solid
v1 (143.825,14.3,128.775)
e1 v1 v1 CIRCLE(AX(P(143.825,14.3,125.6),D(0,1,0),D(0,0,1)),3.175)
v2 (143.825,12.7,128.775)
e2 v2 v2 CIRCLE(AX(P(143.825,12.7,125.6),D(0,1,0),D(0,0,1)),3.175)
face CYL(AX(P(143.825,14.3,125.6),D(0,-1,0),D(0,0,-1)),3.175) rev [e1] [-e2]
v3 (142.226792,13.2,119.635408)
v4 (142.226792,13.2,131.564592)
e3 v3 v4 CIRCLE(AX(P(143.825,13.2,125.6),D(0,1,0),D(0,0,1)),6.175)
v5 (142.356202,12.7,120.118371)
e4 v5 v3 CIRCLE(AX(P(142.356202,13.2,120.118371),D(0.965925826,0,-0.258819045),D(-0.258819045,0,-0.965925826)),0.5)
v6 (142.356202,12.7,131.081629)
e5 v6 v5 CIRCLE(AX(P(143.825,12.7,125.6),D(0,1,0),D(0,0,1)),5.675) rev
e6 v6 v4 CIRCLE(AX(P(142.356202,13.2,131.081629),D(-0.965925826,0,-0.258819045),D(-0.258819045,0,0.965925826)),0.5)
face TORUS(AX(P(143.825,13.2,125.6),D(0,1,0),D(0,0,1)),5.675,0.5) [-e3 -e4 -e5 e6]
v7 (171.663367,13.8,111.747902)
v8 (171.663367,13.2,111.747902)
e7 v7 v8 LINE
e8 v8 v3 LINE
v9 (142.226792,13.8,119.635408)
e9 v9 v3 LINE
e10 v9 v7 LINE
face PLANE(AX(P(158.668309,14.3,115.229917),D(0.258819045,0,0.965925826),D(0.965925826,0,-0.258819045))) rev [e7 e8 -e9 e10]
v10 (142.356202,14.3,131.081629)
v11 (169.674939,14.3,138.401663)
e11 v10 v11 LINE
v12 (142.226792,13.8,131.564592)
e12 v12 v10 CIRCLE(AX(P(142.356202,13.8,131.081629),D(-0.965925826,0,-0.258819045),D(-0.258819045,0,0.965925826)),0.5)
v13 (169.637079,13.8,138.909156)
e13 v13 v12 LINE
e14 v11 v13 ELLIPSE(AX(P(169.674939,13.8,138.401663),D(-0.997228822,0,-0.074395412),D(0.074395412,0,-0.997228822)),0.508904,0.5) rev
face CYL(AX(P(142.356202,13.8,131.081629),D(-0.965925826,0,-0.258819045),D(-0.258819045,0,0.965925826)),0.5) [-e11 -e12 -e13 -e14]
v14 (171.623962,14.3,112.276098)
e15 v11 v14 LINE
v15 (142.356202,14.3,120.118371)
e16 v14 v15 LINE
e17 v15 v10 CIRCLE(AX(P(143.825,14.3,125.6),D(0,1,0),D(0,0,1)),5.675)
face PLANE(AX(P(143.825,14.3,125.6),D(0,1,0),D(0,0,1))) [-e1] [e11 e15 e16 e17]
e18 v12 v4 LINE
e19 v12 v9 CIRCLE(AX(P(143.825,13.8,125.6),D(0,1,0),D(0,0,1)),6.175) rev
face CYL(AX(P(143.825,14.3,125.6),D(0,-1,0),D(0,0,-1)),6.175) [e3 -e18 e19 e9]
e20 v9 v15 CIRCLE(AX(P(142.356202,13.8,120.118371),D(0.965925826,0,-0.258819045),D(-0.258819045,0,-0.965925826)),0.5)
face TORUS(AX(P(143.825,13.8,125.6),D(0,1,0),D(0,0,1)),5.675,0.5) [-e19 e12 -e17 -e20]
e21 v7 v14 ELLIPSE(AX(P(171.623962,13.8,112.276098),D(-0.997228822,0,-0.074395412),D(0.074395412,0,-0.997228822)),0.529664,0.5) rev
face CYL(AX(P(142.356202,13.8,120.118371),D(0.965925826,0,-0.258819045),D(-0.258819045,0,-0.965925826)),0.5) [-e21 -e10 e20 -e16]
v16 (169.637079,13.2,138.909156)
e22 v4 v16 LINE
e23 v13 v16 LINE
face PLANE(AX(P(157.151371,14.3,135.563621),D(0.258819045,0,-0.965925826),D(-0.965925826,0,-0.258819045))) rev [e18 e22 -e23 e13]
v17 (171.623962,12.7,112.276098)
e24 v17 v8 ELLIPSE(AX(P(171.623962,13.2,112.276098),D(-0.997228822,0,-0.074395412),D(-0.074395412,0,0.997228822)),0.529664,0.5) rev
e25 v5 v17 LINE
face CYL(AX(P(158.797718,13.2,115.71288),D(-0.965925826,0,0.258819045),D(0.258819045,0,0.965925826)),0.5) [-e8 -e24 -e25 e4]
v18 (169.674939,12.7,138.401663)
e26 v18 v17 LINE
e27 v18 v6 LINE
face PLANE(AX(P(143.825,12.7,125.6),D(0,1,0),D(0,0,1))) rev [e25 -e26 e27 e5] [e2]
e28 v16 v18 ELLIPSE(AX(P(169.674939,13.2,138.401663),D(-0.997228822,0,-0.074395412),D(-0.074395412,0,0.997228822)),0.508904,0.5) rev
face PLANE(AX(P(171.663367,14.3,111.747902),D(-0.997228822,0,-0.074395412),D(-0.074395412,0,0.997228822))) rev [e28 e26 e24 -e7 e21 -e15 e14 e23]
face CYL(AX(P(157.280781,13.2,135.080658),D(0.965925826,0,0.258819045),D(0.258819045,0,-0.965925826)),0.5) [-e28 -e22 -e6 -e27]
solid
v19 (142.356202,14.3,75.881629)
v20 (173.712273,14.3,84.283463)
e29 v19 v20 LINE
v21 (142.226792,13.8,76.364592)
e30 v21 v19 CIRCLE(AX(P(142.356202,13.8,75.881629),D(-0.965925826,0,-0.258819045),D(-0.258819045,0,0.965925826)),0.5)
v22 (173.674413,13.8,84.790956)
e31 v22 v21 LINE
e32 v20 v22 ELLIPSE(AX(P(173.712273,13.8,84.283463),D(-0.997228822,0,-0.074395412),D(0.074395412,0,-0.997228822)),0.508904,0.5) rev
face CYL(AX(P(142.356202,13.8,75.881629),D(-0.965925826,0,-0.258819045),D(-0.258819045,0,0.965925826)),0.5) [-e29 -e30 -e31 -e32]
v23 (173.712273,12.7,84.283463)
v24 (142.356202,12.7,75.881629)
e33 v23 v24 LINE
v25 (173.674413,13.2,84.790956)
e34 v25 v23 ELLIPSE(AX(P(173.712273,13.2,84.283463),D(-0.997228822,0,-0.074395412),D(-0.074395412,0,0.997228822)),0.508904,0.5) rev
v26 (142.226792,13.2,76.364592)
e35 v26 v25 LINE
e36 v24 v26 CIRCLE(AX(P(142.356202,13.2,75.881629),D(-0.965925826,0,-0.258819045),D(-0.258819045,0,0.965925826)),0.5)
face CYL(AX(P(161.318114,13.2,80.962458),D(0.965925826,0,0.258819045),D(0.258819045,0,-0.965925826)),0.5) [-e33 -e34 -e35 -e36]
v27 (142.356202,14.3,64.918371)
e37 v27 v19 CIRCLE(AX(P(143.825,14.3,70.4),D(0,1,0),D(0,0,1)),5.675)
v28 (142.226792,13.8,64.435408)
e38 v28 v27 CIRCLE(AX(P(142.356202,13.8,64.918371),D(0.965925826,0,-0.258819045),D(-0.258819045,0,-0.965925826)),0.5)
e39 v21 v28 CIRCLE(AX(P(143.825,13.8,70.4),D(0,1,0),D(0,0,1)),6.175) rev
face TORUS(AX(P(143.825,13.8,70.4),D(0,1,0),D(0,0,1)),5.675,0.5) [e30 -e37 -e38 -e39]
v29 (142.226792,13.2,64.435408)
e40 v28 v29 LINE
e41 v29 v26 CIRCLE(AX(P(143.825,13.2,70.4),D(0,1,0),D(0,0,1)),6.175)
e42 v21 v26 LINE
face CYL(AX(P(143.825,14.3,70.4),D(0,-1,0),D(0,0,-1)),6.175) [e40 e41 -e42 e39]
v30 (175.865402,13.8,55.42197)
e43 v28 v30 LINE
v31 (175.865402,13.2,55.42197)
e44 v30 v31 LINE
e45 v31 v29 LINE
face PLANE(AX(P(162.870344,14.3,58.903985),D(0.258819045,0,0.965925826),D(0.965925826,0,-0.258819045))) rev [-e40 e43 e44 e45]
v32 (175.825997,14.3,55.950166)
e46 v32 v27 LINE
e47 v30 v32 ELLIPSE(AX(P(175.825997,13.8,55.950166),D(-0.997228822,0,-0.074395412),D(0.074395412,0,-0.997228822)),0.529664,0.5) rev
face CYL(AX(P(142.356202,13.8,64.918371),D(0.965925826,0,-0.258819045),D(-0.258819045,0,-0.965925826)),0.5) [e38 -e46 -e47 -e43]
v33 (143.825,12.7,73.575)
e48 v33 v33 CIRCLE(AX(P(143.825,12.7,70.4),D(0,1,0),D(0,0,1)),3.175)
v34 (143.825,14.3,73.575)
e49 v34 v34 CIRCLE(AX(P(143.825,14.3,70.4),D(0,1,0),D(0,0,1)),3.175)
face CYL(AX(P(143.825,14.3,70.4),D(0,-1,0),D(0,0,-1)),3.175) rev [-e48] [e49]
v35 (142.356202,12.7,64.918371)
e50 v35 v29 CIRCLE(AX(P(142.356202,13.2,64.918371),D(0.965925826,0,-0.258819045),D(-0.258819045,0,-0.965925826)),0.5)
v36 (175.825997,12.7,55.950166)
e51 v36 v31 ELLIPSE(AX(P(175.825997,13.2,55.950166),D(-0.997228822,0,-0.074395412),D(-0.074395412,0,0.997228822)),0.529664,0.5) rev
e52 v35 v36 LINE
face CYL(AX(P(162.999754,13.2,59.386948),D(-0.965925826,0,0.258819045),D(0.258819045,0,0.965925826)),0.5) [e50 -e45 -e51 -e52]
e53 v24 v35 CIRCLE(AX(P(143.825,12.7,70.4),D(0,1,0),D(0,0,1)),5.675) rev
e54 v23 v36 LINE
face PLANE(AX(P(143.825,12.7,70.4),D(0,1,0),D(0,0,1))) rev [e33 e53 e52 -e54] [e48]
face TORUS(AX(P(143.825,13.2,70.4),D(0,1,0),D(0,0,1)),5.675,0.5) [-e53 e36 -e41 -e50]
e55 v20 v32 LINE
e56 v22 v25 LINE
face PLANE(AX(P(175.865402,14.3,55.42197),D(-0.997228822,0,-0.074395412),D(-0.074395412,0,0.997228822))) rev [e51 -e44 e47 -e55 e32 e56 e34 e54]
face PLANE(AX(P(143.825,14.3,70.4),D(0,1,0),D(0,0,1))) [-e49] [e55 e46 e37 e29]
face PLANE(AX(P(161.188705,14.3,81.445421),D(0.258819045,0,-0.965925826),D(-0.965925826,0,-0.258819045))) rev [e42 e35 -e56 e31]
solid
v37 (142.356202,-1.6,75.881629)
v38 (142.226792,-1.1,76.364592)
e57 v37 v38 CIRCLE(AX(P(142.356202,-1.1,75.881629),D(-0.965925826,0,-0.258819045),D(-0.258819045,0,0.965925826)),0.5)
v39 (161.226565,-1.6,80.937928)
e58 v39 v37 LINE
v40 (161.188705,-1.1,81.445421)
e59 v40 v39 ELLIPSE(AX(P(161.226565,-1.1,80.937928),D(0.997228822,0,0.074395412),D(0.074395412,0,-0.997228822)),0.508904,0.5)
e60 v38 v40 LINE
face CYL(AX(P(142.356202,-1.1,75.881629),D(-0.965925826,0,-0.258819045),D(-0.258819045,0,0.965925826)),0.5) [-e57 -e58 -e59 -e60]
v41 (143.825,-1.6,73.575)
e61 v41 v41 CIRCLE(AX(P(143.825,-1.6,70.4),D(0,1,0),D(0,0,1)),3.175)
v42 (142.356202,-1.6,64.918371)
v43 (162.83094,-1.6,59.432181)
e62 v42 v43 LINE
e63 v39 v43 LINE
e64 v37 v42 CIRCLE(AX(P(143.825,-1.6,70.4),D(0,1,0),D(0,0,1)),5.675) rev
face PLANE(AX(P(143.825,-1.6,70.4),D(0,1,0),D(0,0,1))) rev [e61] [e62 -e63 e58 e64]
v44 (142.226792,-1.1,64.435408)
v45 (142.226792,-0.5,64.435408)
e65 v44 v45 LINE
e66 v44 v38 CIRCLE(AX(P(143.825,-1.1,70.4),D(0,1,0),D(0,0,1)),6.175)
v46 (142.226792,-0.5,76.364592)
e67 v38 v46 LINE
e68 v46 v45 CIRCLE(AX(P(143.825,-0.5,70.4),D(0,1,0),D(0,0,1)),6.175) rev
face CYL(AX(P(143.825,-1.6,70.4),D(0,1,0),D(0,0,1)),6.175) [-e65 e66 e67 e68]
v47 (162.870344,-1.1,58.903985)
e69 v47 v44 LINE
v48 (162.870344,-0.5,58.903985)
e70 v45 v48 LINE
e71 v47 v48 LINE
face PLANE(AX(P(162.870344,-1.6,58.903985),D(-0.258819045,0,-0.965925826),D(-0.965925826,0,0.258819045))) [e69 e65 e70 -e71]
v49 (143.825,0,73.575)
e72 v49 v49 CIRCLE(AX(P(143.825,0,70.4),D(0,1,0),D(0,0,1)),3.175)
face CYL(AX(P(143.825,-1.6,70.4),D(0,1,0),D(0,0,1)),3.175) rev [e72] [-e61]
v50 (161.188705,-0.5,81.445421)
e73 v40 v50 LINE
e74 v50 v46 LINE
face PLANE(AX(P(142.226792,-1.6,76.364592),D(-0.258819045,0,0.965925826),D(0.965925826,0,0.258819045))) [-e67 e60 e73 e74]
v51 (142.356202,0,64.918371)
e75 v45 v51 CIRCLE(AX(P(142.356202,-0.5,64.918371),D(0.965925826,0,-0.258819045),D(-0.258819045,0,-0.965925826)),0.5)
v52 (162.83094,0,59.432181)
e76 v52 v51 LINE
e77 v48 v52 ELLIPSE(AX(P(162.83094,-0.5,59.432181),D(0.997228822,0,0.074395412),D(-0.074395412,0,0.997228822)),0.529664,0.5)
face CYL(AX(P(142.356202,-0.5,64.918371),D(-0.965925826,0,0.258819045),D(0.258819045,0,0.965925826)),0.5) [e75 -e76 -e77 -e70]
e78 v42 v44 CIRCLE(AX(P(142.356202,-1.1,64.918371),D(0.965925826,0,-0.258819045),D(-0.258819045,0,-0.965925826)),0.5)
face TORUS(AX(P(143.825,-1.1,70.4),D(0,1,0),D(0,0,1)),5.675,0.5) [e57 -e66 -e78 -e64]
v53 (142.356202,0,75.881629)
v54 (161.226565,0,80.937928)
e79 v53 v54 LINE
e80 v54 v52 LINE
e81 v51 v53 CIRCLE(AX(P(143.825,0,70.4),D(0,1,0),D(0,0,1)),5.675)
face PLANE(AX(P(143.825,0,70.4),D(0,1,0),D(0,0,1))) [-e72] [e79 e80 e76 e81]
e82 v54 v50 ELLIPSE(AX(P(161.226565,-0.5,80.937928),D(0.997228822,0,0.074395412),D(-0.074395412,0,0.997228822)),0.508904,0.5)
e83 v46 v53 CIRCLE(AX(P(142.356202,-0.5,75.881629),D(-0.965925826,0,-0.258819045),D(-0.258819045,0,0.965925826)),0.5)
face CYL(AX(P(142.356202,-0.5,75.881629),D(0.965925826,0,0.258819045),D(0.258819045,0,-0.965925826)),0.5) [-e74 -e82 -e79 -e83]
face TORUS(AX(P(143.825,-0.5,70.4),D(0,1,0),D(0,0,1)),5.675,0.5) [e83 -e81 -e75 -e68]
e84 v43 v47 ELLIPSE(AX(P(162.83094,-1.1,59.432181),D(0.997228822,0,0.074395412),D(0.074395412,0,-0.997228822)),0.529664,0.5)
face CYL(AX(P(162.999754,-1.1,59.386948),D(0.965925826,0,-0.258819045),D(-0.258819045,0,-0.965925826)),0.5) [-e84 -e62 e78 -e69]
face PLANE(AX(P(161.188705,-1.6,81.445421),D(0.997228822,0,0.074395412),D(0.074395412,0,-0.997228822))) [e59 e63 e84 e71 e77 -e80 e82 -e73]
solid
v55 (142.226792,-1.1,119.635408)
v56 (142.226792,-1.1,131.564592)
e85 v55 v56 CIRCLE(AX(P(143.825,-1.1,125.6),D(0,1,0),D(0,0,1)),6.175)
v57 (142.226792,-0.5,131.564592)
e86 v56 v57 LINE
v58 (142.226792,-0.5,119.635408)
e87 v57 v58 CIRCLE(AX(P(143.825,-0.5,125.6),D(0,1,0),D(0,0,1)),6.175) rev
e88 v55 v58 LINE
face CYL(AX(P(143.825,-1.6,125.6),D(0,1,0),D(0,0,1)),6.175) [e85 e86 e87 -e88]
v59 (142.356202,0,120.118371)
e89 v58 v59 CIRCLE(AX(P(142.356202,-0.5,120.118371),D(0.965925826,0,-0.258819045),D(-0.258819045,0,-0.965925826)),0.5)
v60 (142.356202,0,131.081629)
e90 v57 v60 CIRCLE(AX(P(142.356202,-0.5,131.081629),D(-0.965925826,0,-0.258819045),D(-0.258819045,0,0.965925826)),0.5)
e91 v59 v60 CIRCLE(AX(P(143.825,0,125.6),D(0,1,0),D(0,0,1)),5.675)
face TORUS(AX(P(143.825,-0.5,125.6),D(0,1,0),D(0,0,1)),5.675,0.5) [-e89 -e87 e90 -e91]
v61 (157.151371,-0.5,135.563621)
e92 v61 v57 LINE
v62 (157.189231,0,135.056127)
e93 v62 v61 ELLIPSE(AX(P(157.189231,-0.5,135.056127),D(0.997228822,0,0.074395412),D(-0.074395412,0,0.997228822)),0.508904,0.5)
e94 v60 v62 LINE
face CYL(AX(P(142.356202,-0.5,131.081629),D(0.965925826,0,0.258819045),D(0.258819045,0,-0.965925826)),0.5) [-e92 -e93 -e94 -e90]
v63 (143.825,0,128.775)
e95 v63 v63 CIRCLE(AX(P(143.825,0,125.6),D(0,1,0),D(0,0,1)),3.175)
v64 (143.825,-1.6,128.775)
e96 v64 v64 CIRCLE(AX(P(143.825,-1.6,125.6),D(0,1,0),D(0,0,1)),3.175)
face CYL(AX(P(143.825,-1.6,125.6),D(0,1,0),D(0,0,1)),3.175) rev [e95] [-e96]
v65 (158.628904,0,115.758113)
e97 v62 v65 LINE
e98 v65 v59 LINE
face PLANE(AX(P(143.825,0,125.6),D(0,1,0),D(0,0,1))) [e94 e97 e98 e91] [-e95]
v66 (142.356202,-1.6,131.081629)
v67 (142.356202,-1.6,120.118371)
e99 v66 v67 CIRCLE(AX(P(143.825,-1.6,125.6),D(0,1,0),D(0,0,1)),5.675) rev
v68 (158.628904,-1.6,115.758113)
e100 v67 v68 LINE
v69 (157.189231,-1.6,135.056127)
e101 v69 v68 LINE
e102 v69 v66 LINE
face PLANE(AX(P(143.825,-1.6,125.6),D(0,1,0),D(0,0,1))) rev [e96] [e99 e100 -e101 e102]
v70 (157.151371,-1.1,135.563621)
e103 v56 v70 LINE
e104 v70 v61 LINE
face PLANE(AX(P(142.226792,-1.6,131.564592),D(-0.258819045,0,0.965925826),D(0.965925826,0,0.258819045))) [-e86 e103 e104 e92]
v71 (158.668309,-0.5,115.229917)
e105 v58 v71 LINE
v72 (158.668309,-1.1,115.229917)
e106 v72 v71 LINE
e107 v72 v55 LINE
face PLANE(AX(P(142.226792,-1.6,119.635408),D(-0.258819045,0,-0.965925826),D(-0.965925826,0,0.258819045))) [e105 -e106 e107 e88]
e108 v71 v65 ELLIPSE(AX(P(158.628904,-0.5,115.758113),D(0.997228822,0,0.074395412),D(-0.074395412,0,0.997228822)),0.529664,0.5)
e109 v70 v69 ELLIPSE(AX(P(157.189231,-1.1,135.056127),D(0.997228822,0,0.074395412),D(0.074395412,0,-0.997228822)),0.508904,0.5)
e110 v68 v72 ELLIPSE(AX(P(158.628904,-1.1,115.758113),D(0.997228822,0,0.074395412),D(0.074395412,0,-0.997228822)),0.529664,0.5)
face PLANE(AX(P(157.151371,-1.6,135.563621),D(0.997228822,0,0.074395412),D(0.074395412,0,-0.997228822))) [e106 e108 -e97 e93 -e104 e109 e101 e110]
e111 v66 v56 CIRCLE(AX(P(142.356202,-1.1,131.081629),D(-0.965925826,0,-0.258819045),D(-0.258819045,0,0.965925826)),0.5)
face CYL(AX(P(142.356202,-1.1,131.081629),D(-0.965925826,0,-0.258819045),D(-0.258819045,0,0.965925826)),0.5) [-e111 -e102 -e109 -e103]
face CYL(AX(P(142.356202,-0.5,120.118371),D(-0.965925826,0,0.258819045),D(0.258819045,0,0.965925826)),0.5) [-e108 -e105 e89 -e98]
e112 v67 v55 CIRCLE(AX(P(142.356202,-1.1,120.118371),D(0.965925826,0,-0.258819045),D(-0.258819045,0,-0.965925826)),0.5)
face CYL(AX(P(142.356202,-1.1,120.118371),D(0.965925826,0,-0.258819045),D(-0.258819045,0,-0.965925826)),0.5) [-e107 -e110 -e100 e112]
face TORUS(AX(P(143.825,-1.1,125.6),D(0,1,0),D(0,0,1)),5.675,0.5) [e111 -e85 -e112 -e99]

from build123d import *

# Parameters (mm, degrees)
SKETCH11_R                        = 12.7
SKETCH11_R_2                      = 10.7
STRUCTURAL_MEMBER1_DEPTH          = 323.944708568
SKETCH11_ON_SEGMENT_2_R           = 12.7
SKETCH11_ON_SEGMENT_2_R_2         = 10.7
STRUCTURAL_MEMBER1_2_DEPTH        = 323.944708568
EXTRUDEBEARINGRETAINERCYL_START   = -8.5
SKETCH13_R                        = 20.1
SKETCH13_R_2                      = 18.5
EXTRUDEBEARINGRETAINERCYL_DEPTH   = 17
EXTRUDEBRACKETBOTTOM_DEPTH        = 1
EXTRUDEBRACKETTOP_DEPTH           = 1
EXTRUDEBRACKETTOP_2_DEPTH         = 1
EXTRUDEBRACKETTOP_3_DEPTH         = 1
EXTRUDEPILLOWBLOCKTOCYL_START     = -72.5
EXTRUDEPILLOWBLOCKTOCYL_DEPTH     = 1.6
EXTRUDEPILLOWBLOCKTOCYL_START_2   = -59.1
EXTRUDEPILLOWBLOCKTOCYL_2_DEPTH   = 1.6
EXTRUDEPILLOWBLOCKTOCYL_START_3   = 57.5
EXTRUDEPILLOWBLOCKTOCYL_3_DEPTH   = 1.6
EXTRUDEPILLOWBLOCKTOCYL_START_4   = 70.9
EXTRUDEPILLOWBLOCKTOCYL_4_DEPTH   = 1.6
SKETCH28_W                        = 75.967346768
SKETCH28_H                        = 30.904
EXTRUDETRIMPILLOWBLOCKS_DEPTH     = 145
SKETCH29_R                        = 6
EXTRUDEPILLOWBLOCKBOSSES_DEPTH    = 30.904
FILLET6_START                     = 1
FILLET6_DEPTH                     = 29.904
FILLET6_2_DEPTH                   = 30.904
FILLET6_3_ANGLE                   = 105.281339
FILLET6_4_ANGLE                   = 105.281339
FILLET6_5_ANGLE                   = 105.281339
EXTRUDEPILLOWBLOCKTOPS_REACH      = 277.503
EXTRUDEPILLOWBLOCKTOPS_END_RADIUS = 20.1
SKETCH30_W                        = 15
SKETCH30_H                        = 3
FILLETPILLOWBLOCKTOPS_R           = 3
SKETCH19_R                        = 3.175
EXTRUDEBEARINGRETAINERHOLES_DEPTH = 380.637720529
EXTRUDEBRACKETFRONT_DEPTH         = 1.6
EXTRUDEBRACKETREAR_START          = -70
EXTRUDEBRACKETREAR_DEPTH          = 1.6
SKETCH25_R                        = 6.175
EXTRUDEMOUNTINGBOSSES_DEPTH       = 11.7
EXTRUDE2_DEPTH                    = 380.993173687
EXTRUDE2_DEPTH_BACK               = 380.993173687
SKETCH26_R                        = 3.175
SKETCH36_R                        = 3.175
EXTRUDE7_DEPTH                    = 1.6
EXTRUDE7_2_DEPTH                  = 1.6
SKETCH38_R                        = 3.175
EXTRUDE10_DEPTH                   = 1.6
EXTRUDE10_2_DEPTH                 = 1.6
FILLET25_R                        = 0.5
FILLET26_R                        = 0.5
FILLET27_R                        = 0.5
FILLET28_R                        = 0.5


with BuildPart() as part:
    # Sketch11 → Structural Member1 (new body)
    with BuildSketch(Plane(origin=(-155.9, 0, 323.047), x_dir=(-0.9972288216354868, 0, 0.07439541181752263), z_dir=(-0.07439541181752263, 0, -0.9972288216354868))):
        Circle(SKETCH11_R)
        Circle(SKETCH11_R_2, mode=Mode.SUBTRACT)
    extrude(amount=STRUCTURAL_MEMBER1_DEPTH)


with BuildPart() as body_2:
    # Sketch11 on segment 2 (carried to segment 2) → Structural Member1 2 (new body)
    with BuildSketch(Plane(origin=(180, 0, 0), x_dir=(0.997228822, 0, 0.074395412), z_dir=(-0.074395412, 0, 0.997228822))):
        Circle(SKETCH11_ON_SEGMENT_2_R)
        Circle(SKETCH11_ON_SEGMENT_2_R_2, mode=Mode.SUBTRACT)
    extrude(amount=STRUCTURAL_MEMBER1_2_DEPTH)


with BuildPart() as body_3:
    # Sketch13 → ExtrudeBearingRetainerCyl (new body)
    with BuildSketch(Plane(origin=(65, 0, 0), x_dir=(0, 0, -1), z_dir=(1, 0, 0)).offset(EXTRUDEBEARINGRETAINERCYL_START)):
        with Locations((-98, 27.904)):
            Circle(SKETCH13_R)
        with Locations((-98, 27.904)):
            Circle(SKETCH13_R_2, mode=Mode.SUBTRACT)
    extrude(amount=EXTRUDEBEARINGRETAINERCYL_DEPTH)


with BuildPart() as body_4:
    # MirrorBearingRetainerCyl: mirrored copy
    add(body_3.part.mirror(Plane(origin=(0, 0, 0), x_dir=(0, 0, 1), z_dir=(1, 0, 0))))



with BuildPart() as body_5:
    # Sketch15 → ExtrudeBracketBottom (new body)
    with BuildSketch(Plane(origin=(0, 0, 0), x_dir=(1, 0, 0), z_dir=(0, 1, 0))):
        with BuildLine():
            Line((-150, -63), (115, -63))
            ThreePointArc((115, -63), (122.071067812, -60.071067812), (125, -53))
            Line((125, -53), (125, -48))
            ThreePointArc((125, -48), (137.5, -35.5), (150, -48))
            Line((150, -48), (150, -63))
            Line((150, -63), (150, -133))
            Line((150, -133), (-150, -133))
            Line((-150, -133), (-150, -63))
        make_face()
        with BuildLine():
            Line((-130, -75), (130, -75))
            ThreePointArc((130, -75), (137.071067812, -77.928932188), (140, -85))
            Line((140, -85), (140, -111))
            ThreePointArc((140, -111), (137.071067812, -118.071067812), (130, -121))
            Line((130, -121), (-130, -121))
            ThreePointArc((-130, -121), (-137.071067812, -118.071067812), (-140, -111))
            Line((-140, -111), (-140, -85))
            ThreePointArc((-140, -85), (-137.071067812, -77.928932188), (-130, -75))
        make_face(mode=Mode.SUBTRACT)
    extrude(amount=EXTRUDEBRACKETBOTTOM_DEPTH)


with BuildPart() as body_6:
    # Sketch17 → ExtrudeBracketTop (new body)
    with BuildSketch(Plane(origin=(0, 12.7, 0), x_dir=(-1, 0, 0), z_dir=(0, 1, 0))):
        with BuildLine():
            Line((150, 63), (72.5, 63))
            Line((72.5, 63), (72.5, 82))
            Line((72.5, 82), (77.5, 82))
            ThreePointArc((77.5, 82), (80.328427125, 83.171572875), (81.5, 86))
            Line((81.5, 86), (81.5, 110))
            ThreePointArc((81.5, 110), (80.328427125, 112.828427125), (77.5, 114))
            Line((77.5, 114), (72.5, 114))
            Line((72.5, 114), (72.5, 133))
            Line((72.5, 133), (150, 133))
            Line((150, 133), (150, 63))
        make_face()
        with BuildLine():
            Line((104.221825407, 94.464466094), (97.535533906, 87.778174593))
            ThreePointArc((97.535533906, 87.778174593), (92.086582838, 86.694310836), (89, 91.313708499))
            Line((89, 91.313708499), (89, 104.686291501))
            ThreePointArc((89, 104.686291501), (92.086582838, 109.305689164), (97.535533906, 108.221825407))
            Line((97.535533906, 108.221825407), (104.221825407, 101.535533906))
            ThreePointArc((104.221825407, 101.535533906), (105.686291501, 98), (104.221825407, 94.464466094))
        make_face(mode=Mode.SUBTRACT)
        with BuildLine():
            Line((118.686291501, 121), (105.313708499, 121))
            ThreePointArc((105.313708499, 121), (100.694310836, 117.913417162), (101.778174593, 112.464466094))
            Line((101.778174593, 112.464466094), (108.464466094, 105.778174593))
            ThreePointArc((108.464466094, 105.778174593), (112, 104.313708499), (115.535533906, 105.778174593))
            Line((115.535533906, 105.778174593), (122.221825407, 112.464466094))
            ThreePointArc((122.221825407, 112.464466094), (123.305689164, 117.913417162), (118.686291501, 121))
        make_face(mode=Mode.SUBTRACT)
        with BuildLine():
            Line((108.464466094, 90.221825407), (101.778174593, 83.535533906))
            ThreePointArc((101.778174593, 83.535533906), (100.694310836, 78.086582838), (105.313708499, 75))
            Line((105.313708499, 75), (118.686291501, 75))
            ThreePointArc((118.686291501, 75), (123.305689164, 78.086582838), (122.221825407, 83.535533906))
            Line((122.221825407, 83.535533906), (115.535533906, 90.221825407))
            ThreePointArc((115.535533906, 90.221825407), (112, 91.686291501), (108.464466094, 90.221825407))
        make_face(mode=Mode.SUBTRACT)
        with BuildLine():
            Line((126.464466094, 108.221825407), (119.778174593, 101.535533906))
            ThreePointArc((119.778174593, 101.535533906), (118.313708499, 98), (119.778174593, 94.464466094))
            Line((119.778174593, 94.464466094), (126.464466094, 87.778174593))
            ThreePointArc((126.464466094, 87.778174593), (131.913417162, 86.694310836), (135, 91.313708499))
            Line((135, 91.313708499), (135, 104.686291501))
            ThreePointArc((135, 104.686291501), (131.913417162, 109.305689164), (126.464466094, 108.221825407))
        make_face(mode=Mode.SUBTRACT)
    extrude(amount=-EXTRUDEBRACKETTOP_DEPTH)


with BuildPart() as body_7:
    # Sketch17 → ExtrudeBracketTop 2 (new body)
    with BuildSketch(Plane(origin=(0, 12.7, 0), x_dir=(-1, 0, 0), z_dir=(0, 1, 0))):
        with BuildLine():
            Line((-150, 133), (-72.5, 133))
            Line((-72.5, 133), (-72.5, 114))
            Line((-72.5, 114), (-77.5, 114))
            ThreePointArc((-77.5, 114), (-80.328427125, 112.828427125), (-81.5, 110))
            Line((-81.5, 110), (-81.5, 86))
            ThreePointArc((-81.5, 86), (-80.328427125, 83.171572875), (-77.5, 82))
            Line((-77.5, 82), (-72.5, 82))
            Line((-72.5, 82), (-72.5, 63))
            Line((-72.5, 63), (-115, 63))
            ThreePointArc((-115, 63), (-122.071067812, 60.071067812), (-125, 53))
            Line((-125, 53), (-125, 48))
            ThreePointArc((-125, 48), (-137.5, 35.5), (-150, 48))
            Line((-150, 48), (-150, 51.104))
            Line((-150, 51.104), (-150, 133))
        make_face()
        with BuildLine():
            Line((-119.778174593, 94.464466094), (-126.464466094, 87.778174593))
            ThreePointArc((-126.464466094, 87.778174593), (-131.913417162, 86.694310836), (-135, 91.313708499))
            Line((-135, 91.313708499), (-135, 104.686291501))
            ThreePointArc((-135, 104.686291501), (-131.913417162, 109.305689164), (-126.464466094, 108.221825407))
            Line((-126.464466094, 108.221825407), (-119.778174593, 101.535533906))
            ThreePointArc((-119.778174593, 101.535533906), (-118.313708499, 98), (-119.778174593, 94.464466094))
        make_face(mode=Mode.SUBTRACT)
        with BuildLine():
            Line((-105.313708499, 75), (-118.686291501, 75))
            ThreePointArc((-118.686291501, 75), (-123.305689164, 78.086582838), (-122.221825407, 83.535533906))
            Line((-122.221825407, 83.535533906), (-115.535533906, 90.221825407))
            ThreePointArc((-115.535533906, 90.221825407), (-112, 91.686291501), (-108.464466094, 90.221825407))
            Line((-108.464466094, 90.221825407), (-101.778174593, 83.535533906))
            ThreePointArc((-101.778174593, 83.535533906), (-100.694310836, 78.086582838), (-105.313708499, 75))
        make_face(mode=Mode.SUBTRACT)
        with BuildLine():
            Line((-101.778174593, 112.464466094), (-108.464466094, 105.778174593))
            ThreePointArc((-108.464466094, 105.778174593), (-112, 104.313708499), (-115.535533906, 105.778174593))
            Line((-115.535533906, 105.778174593), (-122.221825407, 112.464466094))
            ThreePointArc((-122.221825407, 112.464466094), (-123.305689164, 117.913417162), (-118.686291501, 121))
            Line((-118.686291501, 121), (-105.313708499, 121))
            ThreePointArc((-105.313708499, 121), (-100.694310836, 117.913417162), (-101.778174593, 112.464466094))
        make_face(mode=Mode.SUBTRACT)
        with BuildLine():
            Line((-89, 91.313708499), (-89, 104.686291501))
            ThreePointArc((-89, 104.686291501), (-92.086582838, 109.305689164), (-97.535533906, 108.221825407))
            Line((-97.535533906, 108.221825407), (-104.221825407, 101.535533906))
            ThreePointArc((-104.221825407, 101.535533906), (-105.686291501, 98), (-104.221825407, 94.464466094))
            Line((-104.221825407, 94.464466094), (-97.535533906, 87.778174593))
            ThreePointArc((-97.535533906, 87.778174593), (-92.086582838, 86.694310836), (-89, 91.313708499))
        make_face(mode=Mode.SUBTRACT)
    extrude(amount=-EXTRUDEBRACKETTOP_2_DEPTH)


with BuildPart() as body_8:
    # Sketch17 → ExtrudeBracketTop 3 (new body)
    with BuildSketch(Plane(origin=(0, 12.7, 0), x_dir=(-1, 0, 0), z_dir=(0, 1, 0))):
        with BuildLine():
            Line((-52.5, 82), (-57.5, 82))
            Line((-57.5, 82), (-57.5, 63))
            Line((-57.5, 63), (57.5, 63))
            Line((57.5, 63), (57.5, 82))
            Line((57.5, 82), (52.5, 82))
            ThreePointArc((52.5, 82), (49.671572875, 83.171572875), (48.5, 86))
            Line((48.5, 86), (48.5, 110))
            ThreePointArc((48.5, 110), (49.671572875, 112.828427125), (52.5, 114))
            Line((52.5, 114), (57.5, 114))
            Line((57.5, 114), (57.5, 133))
            Line((57.5, 133), (-57.5, 133))
            Line((-57.5, 133), (-57.5, 114))
            Line((-57.5, 114), (-52.5, 114))
            ThreePointArc((-52.5, 114), (-49.671572875, 112.828427125), (-48.5, 110))
            Line((-48.5, 110), (-48.5, 86))
            ThreePointArc((-48.5, 86), (-49.671572875, 83.171572875), (-52.5, 82))
        make_face()
        with BuildLine():
            Line((-7.289545837, 95.422213636), (-16.210396731, 86.501362742))
            ThreePointArc((-16.210396731, 86.501362742), (-20.544773044, 85.639201688), (-23, 89.313708499))
            Line((-23, 89.313708499), (-23, 107.155410287))
            ThreePointArc((-23, 107.155410287), (-20.544773044, 110.829917097), (-16.210396731, 109.967756044))
            Line((-16.210396731, 109.967756044), (-7.289545837, 101.04690515))
            ThreePointArc((-7.289545837, 101.04690515), (-6.124634082, 98.234559393), (-7.289545837, 95.422213636))
        make_face(mode=Mode.SUBTRACT)
        with BuildLine():
            Line((9.155410287, 75), (-8.686291501, 75))
            ThreePointArc((-8.686291501, 75), (-12.360798312, 77.455226956), (-11.498637258, 81.789603269))
            Line((-11.498637258, 81.789603269), (-2.577786364, 90.710454163))
            ThreePointArc((-2.577786364, 90.710454163), (0.234559393, 91.875365918), (3.04690515, 90.710454163))
            Line((3.04690515, 90.710454163), (11.967756044, 81.789603269))
            ThreePointArc((11.967756044, 81.789603269), (12.829917097, 77.455226956), (9.155410287, 75))
        make_face(mode=Mode.SUBTRACT)
        with BuildLine():
            Line((11.498637258, 114.210396731), (2.577786364, 105.289545837))
            ThreePointArc((2.577786364, 105.289545837), (-0.234559393, 104.124634082), (-3.04690515, 105.289545837))
            Line((-3.04690515, 105.289545837), (-11.967756044, 114.210396731))
            ThreePointArc((-11.967756044, 114.210396731), (-12.829917097, 118.544773044), (-9.155410287, 121))
            Line((-9.155410287, 121), (8.686291501, 121))
            ThreePointArc((8.686291501, 121), (12.360798312, 118.544773044), (11.498637258, 114.210396731))
        make_face(mode=Mode.SUBTRACT)
        with BuildLine():
            Line((23, 88.844589713), (23, 106.686291501))
            ThreePointArc((23, 106.686291501), (20.544773044, 110.360798312), (16.210396731, 109.498637258))
            Line((16.210396731, 109.498637258), (7.289545837, 100.577786364))
            ThreePointArc((7.289545837, 100.577786364), (6.124634082, 97.765440607), (7.289545837, 94.95309485))
            Line((7.289545837, 94.95309485), (16.210396731, 86.032243956))
            ThreePointArc((16.210396731, 86.032243956), (20.544773044, 85.170082903), (23, 88.844589713))
        make_face(mode=Mode.SUBTRACT)
    extrude(amount=-EXTRUDEBRACKETTOP_3_DEPTH)


with BuildPart() as body_4_1:
    add(body_4.part)

    add(body_5.part)  # ExtrudePillowBlockToCyl merges body 5

    add(body_6.part)  # ExtrudePillowBlockToCyl merges body 6
    # ExtrudePillowBlockToCyl: read off the stored shape, not the designer's step
    # ExtrudePillowBlockToCyl outline → ExtrudePillowBlockToCyl (add)
    with BuildSketch(Plane.YZ.offset(EXTRUDEPILLOWBLOCKTOCYL_START)):
        with BuildLine():
            Line((0, 133), (0, -12.967346768))
            Line((0, -12.967346768), (30.904, -12.967346768))
            Line((30.904, -12.967346768), (30.904, 78.12514151))
            ThreePointArc((30.904, 78.12514151), (7.804, 98), (30.904, 117.87485849))
            Line((30.904, 117.87485849), (30.904, 133))
            Line((30.904, 133), (1, 133))
            Line((1, 133), (0, 133))
        make_face()
    extrude(amount=EXTRUDEPILLOWBLOCKTOCYL_DEPTH)


    add(body_8.part)  # ExtrudePillowBlockToCyl 2 merges body 8
    # ExtrudePillowBlockToCyl 2 outline → ExtrudePillowBlockToCyl 2 (add)
    with BuildSketch(Plane.YZ.offset(EXTRUDEPILLOWBLOCKTOCYL_START_2)):
        with BuildLine():
            Line((0, 133), (0, -12.967346768))
            Line((0, -12.967346768), (30.904, -12.967346768))
            Line((30.904, -12.967346768), (30.904, 78.12514151))
            ThreePointArc((30.904, 78.12514151), (7.804, 98), (30.904, 117.87485849))
            Line((30.904, 117.87485849), (30.904, 133))
            Line((30.904, 133), (1, 133))
            Line((1, 133), (0, 133))
        make_face()
    extrude(amount=EXTRUDEPILLOWBLOCKTOCYL_2_DEPTH)


with BuildPart() as body_3_1:
    add(body_3.part)

    add(body_4_1.part)  # ExtrudePillowBlockToCyl 3 merges body 4
    # ExtrudePillowBlockToCyl 3 outline → ExtrudePillowBlockToCyl 3 (add)
    with BuildSketch(Plane.YZ.offset(EXTRUDEPILLOWBLOCKTOCYL_START_3)):
        with BuildLine():
            Line((0, 133), (0, -12.967346768))
            Line((0, -12.967346768), (30.904, -12.967346768))
            Line((30.904, -12.967346768), (30.904, 78.12514151))
            ThreePointArc((30.904, 78.12514151), (7.804, 98), (30.904, 117.87485849))
            Line((30.904, 117.87485849), (30.904, 133))
            Line((30.904, 133), (1, 133))
            Line((1, 133), (0, 133))
        make_face()
    extrude(amount=EXTRUDEPILLOWBLOCKTOCYL_3_DEPTH)

    add(body_7.part)  # ExtrudePillowBlockToCyl 4 merges body 7
    # ExtrudePillowBlockToCyl 4 outline → ExtrudePillowBlockToCyl 4 (add)
    with BuildSketch(Plane.YZ.offset(EXTRUDEPILLOWBLOCKTOCYL_START_4)):
        with BuildLine():
            Line((0, 133), (0, -12.967346768))
            Line((0, -12.967346768), (30.904, -12.967346768))
            Line((30.904, -12.967346768), (30.904, 78.12514151))
            ThreePointArc((30.904, 78.12514151), (7.804, 98), (30.904, 117.87485849))
            Line((30.904, 117.87485849), (30.904, 133))
            Line((30.904, 133), (1, 133))
            Line((1, 133), (0, 133))
        make_face()
    extrude(amount=EXTRUDEPILLOWBLOCKTOCYL_4_DEPTH)

    # Sketch28 → ExtrudeTrimPillowBlocks (cut)
    with BuildSketch(Plane(origin=(72.5, 0, 0), x_dir=(0, 0, -1), z_dir=(1, 0, 0))):
        with Locations((-25.016326616, 15.452)):
            Rectangle(SKETCH28_W, SKETCH28_H)
    extrude(amount=-EXTRUDETRIMPILLOWBLOCKS_DEPTH, mode=Mode.SUBTRACT)

    # Sketch29 → ExtrudePillowBlockBosses (add)
    with BuildSketch(Plane(origin=(0, 0, 0), x_dir=(1, 0, 0), z_dir=(0, 1, 0))):
        with Locations((65, -125.5)):
            Circle(SKETCH29_R)
        with Locations((-65, -125.5)):
            Circle(SKETCH29_R)
        with Locations((-65, -70.5)):
            Circle(SKETCH29_R)
        with Locations((65, -70.5)):
            Circle(SKETCH29_R)
    extrude(amount=EXTRUDEPILLOWBLOCKBOSSES_DEPTH)

    # Fillet6: read off the stored shape, not the designer's step
    # Fillet6 outline → Fillet6 (add)
    with BuildSketch(Plane(origin=(0, 0, 0), x_dir=(1, 0, 0), z_dir=(0, 1, 0)).offset(FILLET6_START)):
        with BuildLine():
            Line((-59.1, -69.409128789), (-59.1, -65.5010001))
            ThreePointArc((-59.1, -65.5010001), (-59.712701665, -66.422954546), (-60.8, -66.215142943))
            ThreePointArc((-60.8, -66.215142943), (-59.703502441, -67.68093746), (-59.1, -69.409128789))
        make_face()
        with BuildLine():
            ThreePointArc((-70.9, -69.409128789), (-70.296497559, -67.68093746), (-69.2, -66.215142943))
            ThreePointArc((-69.2, -66.215142943), (-70.287298335, -66.422954546), (-70.9, -65.5010001))
            Line((-70.9, -65.5010001), (-70.9, -69.409128789))
        make_face()
        with BuildLine():
            Line((70.9, -69.409128789), (70.9, -65.5010001))
            ThreePointArc((70.9, -65.5010001), (70.287298335, -66.422954546), (69.2, -66.215142943))
            ThreePointArc((69.2, -66.215142943), (70.296497559, -67.68093746), (70.9, -69.409128789))
        make_face()
        with BuildLine():
            ThreePointArc((59.1, -69.409128789), (59.703502441, -67.68093746), (60.8, -66.215142943))
            ThreePointArc((60.8, -66.215142943), (59.712701665, -66.422954546), (59.1, -65.5010001))
            Line((59.1, -65.5010001), (59.1, -69.409128789))
        make_face()
        with BuildLine():
            Line((59.1, -126.590871211), (59.1, -130.4989999))
            ThreePointArc((59.1, -130.4989999), (59.712701665, -129.577045454), (60.8, -129.784857057))
            ThreePointArc((60.8, -129.784857057), (59.703502441, -128.31906254), (59.1, -126.590871211))
        make_face()
        with BuildLine():
            ThreePointArc((70.9, -126.590871211), (70.296497559, -128.31906254), (69.2, -129.784857057))
            ThreePointArc((69.2, -129.784857057), (70.287298335, -129.577045454), (70.9, -130.4989999))
            Line((70.9, -130.4989999), (70.9, -126.590871211))
        make_face()
        with BuildLine():
            ThreePointArc((-59.1, -126.590871211), (-59.703502441, -128.31906254), (-60.8, -129.784857057))
            ThreePointArc((-60.8, -129.784857057), (-59.712701665, -129.577045454), (-59.1, -130.4989999))
            Line((-59.1, -130.4989999), (-59.1, -126.590871211))
        make_face()
        with BuildLine():
            ThreePointArc((-70.9, -130.4989999), (-70.287298335, -129.577045454), (-69.2, -129.784857057))
            ThreePointArc((-69.2, -129.784857057), (-70.296497559, -128.31906254), (-70.9, -126.590871211))
            Line((-70.9, -126.590871211), (-70.9, -130.4989999))
        make_face()
    extrude(amount=FILLET6_DEPTH)

    # Fillet6 2 outline → Fillet6 2 (add)
    with BuildSketch(Plane(origin=(0, 0, 0), x_dir=(1, 0, 0), z_dir=(0, 1, 0))):
        with BuildLine():
            ThreePointArc((70.9, -120.5010001), (70.287298335, -121.422954546), (69.2, -121.215142943))
            ThreePointArc((69.2, -121.215142943), (70.296497559, -122.68093746), (70.9, -124.409128789))
            Line((70.9, -124.409128789), (70.9, -120.5010001))
        make_face()
        with BuildLine():
            Line((70.9, -75.4989999), (70.9, -71.590871211))
            ThreePointArc((70.9, -71.590871211), (70.296497559, -73.31906254), (69.2, -74.784857057))
            ThreePointArc((69.2, -74.784857057), (70.287298335, -74.577045454), (70.9, -75.4989999))
        make_face()
        with BuildLine():
            ThreePointArc((59.1, -124.409128789), (59.703502441, -122.68093746), (60.8, -121.215142943))
            ThreePointArc((60.8, -121.215142943), (59.712701665, -121.422954546), (59.1, -120.5010001))
            Line((59.1, -120.5010001), (59.1, -124.409128789))
        make_face()
        with BuildLine():
            ThreePointArc((60.8, -74.784857057), (59.703502441, -73.31906254), (59.1, -71.590871211))
            Line((59.1, -71.590871211), (59.1, -75.4989999))
            ThreePointArc((59.1, -75.4989999), (59.712701665, -74.577045454), (60.8, -74.784857057))
        make_face()
        with BuildLine():
            ThreePointArc((-70.9, -75.4989999), (-70.287298335, -74.577045454), (-69.2, -74.784857057))
            ThreePointArc((-69.2, -74.784857057), (-70.296497559, -73.31906254), (-70.9, -71.590871211))
            Line((-70.9, -71.590871211), (-70.9, -75.4989999))
        make_face()
        with BuildLine():
            Line((-70.9, -120.5010001), (-70.9, -124.409128789))
            ThreePointArc((-70.9, -124.409128789), (-70.296497559, -122.68093746), (-69.2, -121.215142943))
            ThreePointArc((-69.2, -121.215142943), (-70.287298335, -121.422954546), (-70.9, -120.5010001))
        make_face()
        with BuildLine():
            ThreePointArc((-59.1, -71.590871211), (-59.703502441, -73.31906254), (-60.8, -74.784857057))
            ThreePointArc((-60.8, -74.784857057), (-59.712701665, -74.577045454), (-59.1, -75.4989999))
            Line((-59.1, -75.4989999), (-59.1, -71.590871211))
        make_face()
        with BuildLine():
            ThreePointArc((-60.8, -121.215142943), (-59.703502441, -122.68093746), (-59.1, -124.409128789))
            Line((-59.1, -124.409128789), (-59.1, -120.5010001))
            ThreePointArc((-59.1, -120.5010001), (-59.712701665, -121.422954546), (-60.8, -121.215142943))
        make_face()
    extrude(amount=FILLET6_2_DEPTH)

    # Fillet6 3 outline → Fillet6 3 (revolve)
    with BuildSketch(Plane(origin=(65, 0, 70.5), x_dir=(0.7948455434118173, 0, -0.6068118012352535), z_dir=(0.6068118012352535, 0, 0.7948455434118173))):
        with BuildLine():
            ThreePointArc((7, 1), (6.292893219, 1.292893219), (6, 2))
            Line((6, 2), (6, 1))
            Line((6, 1), (7, 1))
        make_face()
    revolve(axis=Axis((65, 0, 70.5), (0, 1, 0)), revolution_arc=FILLET6_3_ANGLE)

    # Fillet6 4 outline → Fillet6 4 (revolve)
    with BuildSketch(Plane(origin=(65, 0, 125.5), x_dir=(-0.7948455434118179, 0, 0.6068118012352527), z_dir=(-0.6068118012352527, 0, -0.7948455434118179))):
        with BuildLine():
            ThreePointArc((7, 1), (6.292893219, 1.292893219), (6, 2))
            Line((6, 2), (6, 1))
            Line((6, 1), (7, 1))
        make_face()
    revolve(axis=Axis((65, 0, 125.5), (0, 1, 0)), revolution_arc=FILLET6_4_ANGLE)

    # Fillet6 5 outline → Fillet6 5 (revolve)
    with BuildSketch(Plane(origin=(-65, 0, 125.5), x_dir=(-0.794845543411815, 0, 0.6068118012352566), z_dir=(-0.6068118012352566, 0, -0.794845543411815))):
        with BuildLine():
            ThreePointArc((7, 1), (6.292893219, 1.292893219), (6, 2))
            Line((6, 2), (6, 1))
            Line((6, 1), (7, 1))
        make_face()
    revolve(axis=Axis((-65, 0, 125.5), (0, 1, 0)), revolution_arc=FILLET6_5_ANGLE)

    # ExtrudePillowBlockTops: up to this cylinder (the profile starts outside it)
    extrudepillowblocktops_end = Plane(origin=(0, 27.904, 98), z_dir=(-1, 0, 0)) * Cylinder(EXTRUDEPILLOWBLOCKTOPS_END_RADIUS, 726.206, mode=Mode.PRIVATE)
    # Sketch30 → ExtrudePillowBlockTops (add, up to the surface)
    with BuildSketch(Plane.XY.offset(133), mode=Mode.PRIVATE) as extrudepillowblocktops_sk1:
        with Locations((-65, 30.904)):
            Rectangle(SKETCH30_W, SKETCH30_H)
    extrudepillowblocktops_tool1 = extrude(extrudepillowblocktops_sk1.sketch, amount=-EXTRUDEPILLOWBLOCKTOPS_REACH, mode=Mode.PRIVATE) - extrudepillowblocktops_end
    # Sketch30 → ExtrudePillowBlockTops (add, up to the surface)
    with BuildSketch(Plane.XY.offset(133), mode=Mode.PRIVATE) as extrudepillowblocktops_sk2:
        with Locations((65, 30.904)):
            Rectangle(SKETCH30_W, SKETCH30_H)
    extrudepillowblocktops_tool2 = extrude(extrudepillowblocktops_sk2.sketch, amount=-EXTRUDEPILLOWBLOCKTOPS_REACH, mode=Mode.PRIVATE) - extrudepillowblocktops_end
    extrudepillowblocktops = extrudepillowblocktops_tool1.solids().sort_by_distance((-65, 30.904, 133))[0] + extrudepillowblocktops_tool2.solids().sort_by_distance((65, 30.904, 133))[0]
    add(extrudepillowblocktops)

    # MirrorPillowBlockTops: ExtrudePillowBlockTops across plane
    add(extrudepillowblocktops.mirror(Plane.XY.offset(98)))

    # FilletPillowBlockTops
    filletpillowblocktops_edges = [body_3_1.edges().sort_by_distance(p)[0] for p in [
        (-65, 32.404, 117.589793261),
        (65, 32.404, 117.589793261),
        (-65, 32.404, 78.410206739),
        (65, 32.404, 78.410206739),
    ]]
    fillet(filletpillowblocktops_edges, radius=FILLETPILLOWBLOCKTOPS_R)

    # Sketch19 → ExtrudeBearingRetainerHoles (cut, through all)
    with BuildSketch(Plane(origin=(0, 32.404, 0), x_dir=(1, 0, 0), z_dir=(0, 1, 0))):
        with Locations(Location((65, -113.604, 0), (0, 0, 270))):
            Circle(SKETCH19_R)
        with Locations(Location((-65, -113.604, 0), (0, 0, 270))):
            Circle(SKETCH19_R)
        with Locations(Location((-65, -82.396, 0), (0, 0, 270))):
            Circle(SKETCH19_R)
        with Locations(Location((65, -82.396, 0), (0, 0, 270))):
            Circle(SKETCH19_R)
    extrude(amount=-EXTRUDEBEARINGRETAINERHOLES_DEPTH, mode=Mode.SUBTRACT)

    # Sketch20 → ExtrudeBracketFront (add)
    with BuildSketch(Plane.XY.offset(133)):
        Polygon((-98.5, 12.7), (-73.5, 27.904), (-53.5, 27.904), (-28.5, 12.7), (28.5, 12.7), (53.5, 27.904), (73.5, 27.904), (98.5, 12.7), (150, 12.7), (150, 0), (145, 0), (-145, 0), (-150, 0), (-150, 12.7), align=None)
    extrude(amount=EXTRUDEBRACKETFRONT_DEPTH)

    # Sketch20<3> → ExtrudeBracketRear (add)
    with BuildSketch(Plane.XY.offset(133).offset(EXTRUDEBRACKETREAR_START)):
        Polygon((-98.5, 12.7), (-73.5, 27.904), (-53.5, 27.904), (-28.5, 12.7), (28.5, 12.7), (53.5, 27.904), (73.5, 27.904), (98.5, 12.7), (150, 12.7), (150, 0), (145, 0), (-145, 0), (-150, 0), (-150, 12.7), align=None)
    extrude(amount=-EXTRUDEBRACKETREAR_DEPTH)

    # Sketch25 → ExtrudeMountingBosses (add)
    with BuildSketch(Plane(origin=(0, 0, 0), x_dir=(1, 0, 0), z_dir=(0, 1, 0))):
        with Locations(Location((-143.825, -70.4, 0), (0, 0, 180))):
            Circle(SKETCH25_R)
        with Locations(Location((-143.825, -125.6, 0), (0, 0, 180))):
            Circle(SKETCH25_R)
        with Locations((143.825, -70.4)):
            Circle(SKETCH25_R)
        with Locations((143.825, -125.6)):
            Circle(SKETCH25_R)
    extrude(amount=EXTRUDEMOUNTINGBOSSES_DEPTH)

    # Sketch26 → Extrude2 (cut, two sides: drawn at the far end of the back side and taken through both)
    with BuildSketch(Plane(origin=(0, 0, 0), x_dir=(1, 0, 0), z_dir=(0, 1, 0)).offset(-EXTRUDE2_DEPTH_BACK)):
        with Locations(Location((-143.825, -70.4, 0), (0, 0, 270))):
            Circle(SKETCH26_R)
        with Locations(Location((-143.825, -125.6, 0), (0, 0, 270))):
            Circle(SKETCH26_R)
        with Locations(Location((143.825, -70.4, 0), (0, 0, 270))):
            Circle(SKETCH26_R)
        with Locations(Location((143.825, -125.6, 0), (0, 0, 270))):
            Circle(SKETCH26_R)
    extrude(amount=EXTRUDE2_DEPTH + EXTRUDE2_DEPTH_BACK, mode=Mode.SUBTRACT)


with BuildPart() as body_4_2:
    # Sketch36 → Extrude7 (new body)
    with BuildSketch(Plane(origin=(0, 0, 0), x_dir=(1, 0, 0), z_dir=(0, 1, 0))):
        with BuildLine():
            Line((162.870344453, -58.90398492), (142.226792396, -64.435408023))
            ThreePointArc((142.226792396, -64.435408023), (137.65, -70.4), (142.226792396, -76.364591977))
            Line((142.226792396, -76.364591977), (161.188704901, -81.44542112))
            Line((161.188704901, -81.44542112), (162.870344453, -58.90398492))
        make_face()
        with Locations(Location((143.825, -70.4, 0), (0, 0, 270))):
            Circle(SKETCH36_R, mode=Mode.SUBTRACT)
    extrude(amount=-EXTRUDE7_DEPTH)

    # Fillet27
    fillet27_edges = [body_4_2.edges().sort_by_distance(p)[0] for p in [
        (137.65, -1.6, 70.4),
        (151.707748649, -1.6, 78.905006549),
        (151.707748649, 0, 78.905006549),
        (137.65, 0, 70.4),
        (152.548568425, 0, 61.669696471),
        (152.548568425, -1.6, 61.669696471),
    ]]
    fillet(fillet27_edges, radius=FILLET27_R)


with BuildPart() as body_5_2:
    # Sketch36 → Extrude7 2 (new body)
    with BuildSketch(Plane(origin=(0, 0, 0), x_dir=(1, 0, 0), z_dir=(0, 1, 0))):
        with BuildLine():
            Line((157.15137098, -135.563620756), (158.668308955, -115.229916938))
            Line((158.668308955, -115.229916938), (142.226792396, -119.635408023))
            ThreePointArc((142.226792396, -119.635408023), (137.65, -125.6), (142.226792396, -131.564591977))
            Line((142.226792396, -131.564591977), (157.15137098, -135.563620756))
        make_face()
        with Locations(Location((143.825, -125.6, 0), (0, 0, 270))):
            Circle(SKETCH36_R, mode=Mode.SUBTRACT)
    extrude(amount=-EXTRUDE7_2_DEPTH)

    # Fillet28
    fillet28_edges = [body_5_2.edges().sort_by_distance(p)[0] for p in [
        (150.447550676, -1.6, 117.432662481),
        (137.65, -1.6, 125.6),
        (150.447550676, 0, 117.432662481),
        (149.689081688, 0, 133.564106367),
        (137.65, 0, 125.6),
        (149.689081688, -1.6, 133.564106367),
    ]]
    fillet(fillet28_edges, radius=FILLET28_R)


with BuildPart() as body_6_2:
    # Sketch38 → Extrude10 (new body)
    with BuildSketch(Plane(origin=(0, 12.7, 0), x_dir=(-1, 0, 0), z_dir=(0, 1, 0))):
        with BuildLine():
            Line((-162.870344453, 58.90398492), (-175.865402029, 55.421969737))
            Line((-175.865402029, 55.421969737), (-173.674412549, 84.790956401))
            Line((-173.674412549, 84.790956401), (-161.188704901, 81.44542112))
            Line((-161.188704901, 81.44542112), (-142.226792396, 76.364591977))
            ThreePointArc((-142.226792396, 76.364591977), (-137.65, 70.4), (-142.226792396, 64.435408023))
            Line((-142.226792396, 64.435408023), (-162.870344453, 58.90398492))
        make_face()
        with Locations(Location((-143.825, 70.4, 0), (0, 0, 90))):
            Circle(SKETCH38_R, mode=Mode.SUBTRACT)
    extrude(amount=EXTRUDE10_DEPTH)

    # Fillet26
    fillet26_edges = [body_6_2.edges().sort_by_distance(p)[0] for p in [
        (159.046097213, 14.3, 59.92868888),
        (137.65, 14.3, 70.4),
        (159.046097213, 12.7, 59.92868888),
        (157.950602473, 14.3, 80.577774189),
        (157.950602473, 12.7, 80.577774189),
        (137.65, 12.7, 70.4),
    ]]
    fillet(fillet26_edges, radius=FILLET26_R)


with BuildPart() as body_7_2:
    # Sketch38 → Extrude10 2 (new body)
    with BuildSketch(Plane(origin=(0, 12.7, 0), x_dir=(-1, 0, 0), z_dir=(0, 1, 0))):
        with BuildLine():
            Line((-158.668308955, 115.229916938), (-171.663366531, 111.747901755))
            Line((-171.663366531, 111.747901755), (-169.637078628, 138.909156037))
            Line((-169.637078628, 138.909156037), (-157.15137098, 135.563620756))
            Line((-157.15137098, 135.563620756), (-142.226792396, 131.564591977))
            ThreePointArc((-142.226792396, 131.564591977), (-137.65, 125.6), (-142.226792396, 119.635408023))
            Line((-142.226792396, 119.635408023), (-158.668308955, 115.229916938))
        make_face()
        with Locations(Location((-143.825, 125.6, 0), (0, 0, 90))):
            Circle(SKETCH38_R, mode=Mode.SUBTRACT)
    extrude(amount=EXTRUDE10_2_DEPTH)

    # Fillet25
    fillet25_edges = [body_7_2.edges().sort_by_distance(p)[0] for p in [
        (155.931935512, 14.3, 135.236874007),
        (156.945079464, 14.3, 115.691654889),
        (156.945079464, 12.7, 115.691654889),
        (155.931935512, 12.7, 135.236874007),
        (137.65, 14.3, 125.6),
        (137.65, 12.7, 125.6),
    ]]
    fillet(fillet25_edges, radius=FILLET25_R)


solid = Compound([body_4_2.part, body_5_2.part, body_6_2.part, body_7_2.part])
